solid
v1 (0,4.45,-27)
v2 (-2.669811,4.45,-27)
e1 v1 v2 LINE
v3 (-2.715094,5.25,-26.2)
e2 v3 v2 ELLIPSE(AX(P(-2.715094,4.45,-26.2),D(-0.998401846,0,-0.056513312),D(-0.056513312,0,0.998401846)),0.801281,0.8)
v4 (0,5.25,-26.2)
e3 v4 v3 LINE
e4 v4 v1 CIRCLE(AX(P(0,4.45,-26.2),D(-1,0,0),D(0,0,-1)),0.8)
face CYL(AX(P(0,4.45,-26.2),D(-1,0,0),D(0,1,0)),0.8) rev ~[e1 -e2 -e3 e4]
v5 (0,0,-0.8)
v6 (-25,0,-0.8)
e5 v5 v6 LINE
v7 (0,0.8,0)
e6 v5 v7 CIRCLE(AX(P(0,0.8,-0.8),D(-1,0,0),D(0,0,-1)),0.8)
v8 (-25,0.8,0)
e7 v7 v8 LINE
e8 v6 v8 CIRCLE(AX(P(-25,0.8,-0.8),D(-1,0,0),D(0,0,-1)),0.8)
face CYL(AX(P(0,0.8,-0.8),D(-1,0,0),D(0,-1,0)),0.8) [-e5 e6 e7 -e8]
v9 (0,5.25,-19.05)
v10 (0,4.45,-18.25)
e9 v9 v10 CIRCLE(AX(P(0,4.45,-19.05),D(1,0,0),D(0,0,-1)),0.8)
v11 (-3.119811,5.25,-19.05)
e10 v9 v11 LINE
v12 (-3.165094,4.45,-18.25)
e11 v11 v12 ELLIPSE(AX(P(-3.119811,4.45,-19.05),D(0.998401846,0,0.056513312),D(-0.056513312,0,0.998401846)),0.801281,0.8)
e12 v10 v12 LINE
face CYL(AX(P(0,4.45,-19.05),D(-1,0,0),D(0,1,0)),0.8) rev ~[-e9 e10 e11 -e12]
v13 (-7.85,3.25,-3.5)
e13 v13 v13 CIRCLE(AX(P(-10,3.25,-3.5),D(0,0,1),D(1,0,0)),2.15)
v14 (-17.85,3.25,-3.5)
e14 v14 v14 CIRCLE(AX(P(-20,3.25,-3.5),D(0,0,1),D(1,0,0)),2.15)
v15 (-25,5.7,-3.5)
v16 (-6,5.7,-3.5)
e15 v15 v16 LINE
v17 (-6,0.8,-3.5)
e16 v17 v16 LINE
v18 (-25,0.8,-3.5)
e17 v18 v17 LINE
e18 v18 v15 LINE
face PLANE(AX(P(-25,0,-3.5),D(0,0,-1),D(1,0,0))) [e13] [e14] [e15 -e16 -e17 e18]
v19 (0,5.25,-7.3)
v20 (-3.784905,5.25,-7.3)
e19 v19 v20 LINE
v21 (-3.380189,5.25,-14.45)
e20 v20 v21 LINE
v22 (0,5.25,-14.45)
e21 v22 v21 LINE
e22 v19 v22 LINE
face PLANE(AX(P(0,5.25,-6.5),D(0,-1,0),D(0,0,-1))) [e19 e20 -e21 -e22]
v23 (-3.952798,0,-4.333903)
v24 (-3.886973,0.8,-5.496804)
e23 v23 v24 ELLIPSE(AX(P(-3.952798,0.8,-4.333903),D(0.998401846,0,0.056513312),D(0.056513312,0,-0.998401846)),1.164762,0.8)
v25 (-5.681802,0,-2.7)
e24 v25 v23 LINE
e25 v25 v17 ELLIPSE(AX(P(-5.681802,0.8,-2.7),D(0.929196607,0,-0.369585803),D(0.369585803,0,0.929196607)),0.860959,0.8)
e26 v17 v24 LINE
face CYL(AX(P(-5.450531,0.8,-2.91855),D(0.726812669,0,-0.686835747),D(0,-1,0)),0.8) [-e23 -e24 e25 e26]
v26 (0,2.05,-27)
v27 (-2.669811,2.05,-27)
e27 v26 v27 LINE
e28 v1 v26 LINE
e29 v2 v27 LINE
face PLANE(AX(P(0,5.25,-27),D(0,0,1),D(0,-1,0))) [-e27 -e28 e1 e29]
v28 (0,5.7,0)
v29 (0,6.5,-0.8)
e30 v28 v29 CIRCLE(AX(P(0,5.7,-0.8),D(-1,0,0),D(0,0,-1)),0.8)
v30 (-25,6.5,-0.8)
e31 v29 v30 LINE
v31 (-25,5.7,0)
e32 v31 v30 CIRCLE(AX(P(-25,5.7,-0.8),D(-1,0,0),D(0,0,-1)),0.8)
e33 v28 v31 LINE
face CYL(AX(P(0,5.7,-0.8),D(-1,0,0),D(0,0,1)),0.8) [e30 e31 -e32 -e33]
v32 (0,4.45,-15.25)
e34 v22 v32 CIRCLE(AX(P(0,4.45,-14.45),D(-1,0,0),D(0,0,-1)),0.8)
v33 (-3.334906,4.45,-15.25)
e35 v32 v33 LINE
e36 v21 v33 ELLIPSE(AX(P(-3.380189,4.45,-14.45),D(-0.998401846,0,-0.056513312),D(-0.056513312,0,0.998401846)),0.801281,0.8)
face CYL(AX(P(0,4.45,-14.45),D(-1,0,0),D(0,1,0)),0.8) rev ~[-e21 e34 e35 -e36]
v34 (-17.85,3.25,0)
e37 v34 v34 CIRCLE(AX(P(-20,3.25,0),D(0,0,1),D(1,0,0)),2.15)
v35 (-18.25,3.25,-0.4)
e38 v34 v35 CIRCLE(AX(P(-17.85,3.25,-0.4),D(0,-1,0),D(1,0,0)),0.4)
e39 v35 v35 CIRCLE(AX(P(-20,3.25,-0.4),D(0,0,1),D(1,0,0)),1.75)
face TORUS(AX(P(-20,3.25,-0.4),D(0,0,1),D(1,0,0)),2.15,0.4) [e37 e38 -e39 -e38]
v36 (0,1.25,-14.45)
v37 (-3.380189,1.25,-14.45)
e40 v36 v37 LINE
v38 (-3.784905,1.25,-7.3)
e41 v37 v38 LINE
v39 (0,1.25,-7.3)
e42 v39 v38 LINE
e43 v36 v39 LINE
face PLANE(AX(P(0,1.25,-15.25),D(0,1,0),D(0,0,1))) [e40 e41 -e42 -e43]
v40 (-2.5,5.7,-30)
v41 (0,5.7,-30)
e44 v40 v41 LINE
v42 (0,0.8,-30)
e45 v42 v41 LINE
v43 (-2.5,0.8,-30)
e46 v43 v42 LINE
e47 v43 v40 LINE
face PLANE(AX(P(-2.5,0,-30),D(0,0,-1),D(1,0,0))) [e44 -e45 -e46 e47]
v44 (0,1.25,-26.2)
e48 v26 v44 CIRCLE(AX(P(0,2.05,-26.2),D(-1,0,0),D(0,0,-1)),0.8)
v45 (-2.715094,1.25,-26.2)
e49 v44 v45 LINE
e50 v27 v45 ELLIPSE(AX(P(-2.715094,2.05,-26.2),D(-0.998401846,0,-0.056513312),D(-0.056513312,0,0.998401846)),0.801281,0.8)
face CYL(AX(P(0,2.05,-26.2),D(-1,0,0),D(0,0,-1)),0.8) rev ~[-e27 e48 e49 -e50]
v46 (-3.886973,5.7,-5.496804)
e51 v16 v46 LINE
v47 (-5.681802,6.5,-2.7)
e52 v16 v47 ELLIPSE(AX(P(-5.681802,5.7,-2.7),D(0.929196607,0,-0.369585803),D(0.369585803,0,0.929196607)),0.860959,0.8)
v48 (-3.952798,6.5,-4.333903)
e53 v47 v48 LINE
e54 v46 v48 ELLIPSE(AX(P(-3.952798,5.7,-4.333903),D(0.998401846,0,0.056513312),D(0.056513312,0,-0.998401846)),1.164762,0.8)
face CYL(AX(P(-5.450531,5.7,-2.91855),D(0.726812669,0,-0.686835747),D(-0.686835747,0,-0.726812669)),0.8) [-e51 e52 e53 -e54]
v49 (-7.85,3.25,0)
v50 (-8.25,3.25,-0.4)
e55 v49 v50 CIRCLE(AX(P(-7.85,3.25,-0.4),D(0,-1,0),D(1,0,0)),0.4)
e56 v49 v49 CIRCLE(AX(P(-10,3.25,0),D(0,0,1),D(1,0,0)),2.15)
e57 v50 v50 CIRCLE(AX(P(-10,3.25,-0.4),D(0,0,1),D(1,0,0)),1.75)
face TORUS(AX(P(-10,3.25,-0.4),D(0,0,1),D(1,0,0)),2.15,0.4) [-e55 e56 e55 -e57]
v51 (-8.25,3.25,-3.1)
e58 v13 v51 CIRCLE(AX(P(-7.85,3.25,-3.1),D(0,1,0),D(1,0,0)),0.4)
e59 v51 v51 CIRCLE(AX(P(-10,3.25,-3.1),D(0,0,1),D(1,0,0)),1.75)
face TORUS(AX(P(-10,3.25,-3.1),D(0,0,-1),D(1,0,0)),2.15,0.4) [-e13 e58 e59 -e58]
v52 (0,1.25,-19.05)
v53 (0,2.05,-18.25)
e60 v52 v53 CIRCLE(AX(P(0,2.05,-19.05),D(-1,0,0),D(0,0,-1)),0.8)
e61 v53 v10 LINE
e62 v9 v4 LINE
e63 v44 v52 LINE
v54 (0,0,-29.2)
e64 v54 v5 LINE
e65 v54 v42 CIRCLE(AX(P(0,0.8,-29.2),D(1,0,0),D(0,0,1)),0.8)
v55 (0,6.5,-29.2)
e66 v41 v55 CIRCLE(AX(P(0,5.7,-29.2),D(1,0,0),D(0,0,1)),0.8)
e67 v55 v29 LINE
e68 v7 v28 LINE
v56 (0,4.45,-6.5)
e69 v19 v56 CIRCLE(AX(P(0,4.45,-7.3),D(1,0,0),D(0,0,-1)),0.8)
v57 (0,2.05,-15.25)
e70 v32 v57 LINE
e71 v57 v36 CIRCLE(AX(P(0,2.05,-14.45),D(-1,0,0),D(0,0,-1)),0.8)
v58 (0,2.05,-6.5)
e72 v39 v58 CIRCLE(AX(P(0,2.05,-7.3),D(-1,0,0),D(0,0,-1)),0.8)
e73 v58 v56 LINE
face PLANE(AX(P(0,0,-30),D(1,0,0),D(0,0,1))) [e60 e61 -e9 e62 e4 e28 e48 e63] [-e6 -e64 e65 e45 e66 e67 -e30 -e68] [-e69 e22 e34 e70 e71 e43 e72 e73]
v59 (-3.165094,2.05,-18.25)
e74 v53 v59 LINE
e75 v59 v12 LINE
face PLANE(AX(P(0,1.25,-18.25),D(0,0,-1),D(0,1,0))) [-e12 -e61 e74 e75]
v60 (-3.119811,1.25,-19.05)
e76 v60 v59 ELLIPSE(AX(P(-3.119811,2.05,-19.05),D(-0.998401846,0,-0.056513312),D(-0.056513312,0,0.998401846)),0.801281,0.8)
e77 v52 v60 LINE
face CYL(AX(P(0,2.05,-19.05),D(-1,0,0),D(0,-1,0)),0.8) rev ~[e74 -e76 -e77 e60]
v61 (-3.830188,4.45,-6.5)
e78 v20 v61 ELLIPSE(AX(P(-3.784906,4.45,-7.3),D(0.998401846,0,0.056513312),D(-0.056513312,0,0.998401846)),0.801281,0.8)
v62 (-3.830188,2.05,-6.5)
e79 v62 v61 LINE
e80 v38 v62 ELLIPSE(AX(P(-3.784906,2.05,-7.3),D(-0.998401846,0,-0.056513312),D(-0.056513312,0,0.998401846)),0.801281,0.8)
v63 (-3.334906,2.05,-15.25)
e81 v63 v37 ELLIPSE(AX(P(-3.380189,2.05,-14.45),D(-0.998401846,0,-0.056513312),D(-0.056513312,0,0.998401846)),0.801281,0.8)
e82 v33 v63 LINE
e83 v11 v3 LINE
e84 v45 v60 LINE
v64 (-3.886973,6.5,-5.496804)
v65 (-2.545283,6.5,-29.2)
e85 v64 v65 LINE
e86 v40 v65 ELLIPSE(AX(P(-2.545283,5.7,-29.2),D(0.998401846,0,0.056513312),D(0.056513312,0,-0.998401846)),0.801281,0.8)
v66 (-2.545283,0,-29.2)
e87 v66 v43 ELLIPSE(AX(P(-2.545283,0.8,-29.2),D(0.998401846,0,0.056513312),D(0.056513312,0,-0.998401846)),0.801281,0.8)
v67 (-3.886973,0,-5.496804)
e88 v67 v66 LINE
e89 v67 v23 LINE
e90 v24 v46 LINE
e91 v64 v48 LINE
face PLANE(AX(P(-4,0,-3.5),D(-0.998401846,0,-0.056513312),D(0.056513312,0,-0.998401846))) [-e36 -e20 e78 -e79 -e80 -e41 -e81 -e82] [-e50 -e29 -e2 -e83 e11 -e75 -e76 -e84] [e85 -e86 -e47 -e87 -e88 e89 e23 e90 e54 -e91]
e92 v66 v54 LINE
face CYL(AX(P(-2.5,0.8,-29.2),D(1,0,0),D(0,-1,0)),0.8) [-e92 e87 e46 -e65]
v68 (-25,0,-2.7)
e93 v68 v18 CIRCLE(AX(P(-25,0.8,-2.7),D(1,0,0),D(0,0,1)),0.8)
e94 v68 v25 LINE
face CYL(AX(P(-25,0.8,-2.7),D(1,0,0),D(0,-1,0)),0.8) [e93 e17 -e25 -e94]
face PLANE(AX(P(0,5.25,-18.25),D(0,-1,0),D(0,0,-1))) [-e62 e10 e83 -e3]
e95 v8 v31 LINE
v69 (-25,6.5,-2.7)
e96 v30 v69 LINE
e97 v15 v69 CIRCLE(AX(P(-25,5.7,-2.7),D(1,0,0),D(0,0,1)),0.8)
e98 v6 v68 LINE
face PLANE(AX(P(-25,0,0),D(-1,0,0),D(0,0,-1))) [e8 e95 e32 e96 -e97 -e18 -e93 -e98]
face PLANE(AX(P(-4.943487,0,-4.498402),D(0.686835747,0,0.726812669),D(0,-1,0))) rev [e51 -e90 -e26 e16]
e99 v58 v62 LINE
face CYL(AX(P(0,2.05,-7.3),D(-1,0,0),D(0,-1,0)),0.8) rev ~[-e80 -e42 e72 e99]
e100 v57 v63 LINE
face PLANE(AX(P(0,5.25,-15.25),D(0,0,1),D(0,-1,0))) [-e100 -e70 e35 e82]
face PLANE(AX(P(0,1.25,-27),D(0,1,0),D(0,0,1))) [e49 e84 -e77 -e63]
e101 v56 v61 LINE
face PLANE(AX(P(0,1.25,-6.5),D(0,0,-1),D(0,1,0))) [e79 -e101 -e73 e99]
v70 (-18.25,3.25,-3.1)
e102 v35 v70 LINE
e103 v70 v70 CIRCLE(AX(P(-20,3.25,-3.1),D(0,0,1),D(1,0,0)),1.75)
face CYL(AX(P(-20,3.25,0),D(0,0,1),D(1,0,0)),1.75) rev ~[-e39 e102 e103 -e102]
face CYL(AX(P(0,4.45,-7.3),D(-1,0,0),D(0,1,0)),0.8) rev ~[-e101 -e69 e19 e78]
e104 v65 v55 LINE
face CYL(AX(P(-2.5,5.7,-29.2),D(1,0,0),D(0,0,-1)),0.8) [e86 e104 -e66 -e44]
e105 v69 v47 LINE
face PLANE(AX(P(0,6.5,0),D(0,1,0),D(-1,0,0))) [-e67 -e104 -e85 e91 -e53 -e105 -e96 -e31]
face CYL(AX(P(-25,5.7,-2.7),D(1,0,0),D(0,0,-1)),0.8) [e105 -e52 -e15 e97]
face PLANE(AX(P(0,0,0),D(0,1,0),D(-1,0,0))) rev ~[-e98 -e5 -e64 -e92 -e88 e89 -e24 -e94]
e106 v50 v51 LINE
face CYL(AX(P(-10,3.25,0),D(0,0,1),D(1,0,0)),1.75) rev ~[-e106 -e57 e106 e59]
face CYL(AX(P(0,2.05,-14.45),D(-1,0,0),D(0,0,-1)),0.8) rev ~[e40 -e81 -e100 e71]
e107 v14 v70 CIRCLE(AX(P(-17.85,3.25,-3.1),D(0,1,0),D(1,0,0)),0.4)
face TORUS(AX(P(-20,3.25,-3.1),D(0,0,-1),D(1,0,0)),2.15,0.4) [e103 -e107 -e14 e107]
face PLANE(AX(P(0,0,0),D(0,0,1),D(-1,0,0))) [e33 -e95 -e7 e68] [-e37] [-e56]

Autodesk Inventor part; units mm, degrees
ref_plane "YZ Plane" through (0, 0, 0) normal (1, 0, 0) x (0, 1, 0)
ref_plane "XZ Plane" through (0, 0, 0) normal (0, 1, 0) x (-1, 0, 0)
ref_plane "XY Plane" through (0, 0, 0) normal (0, 0, 1) x (1, 0, 0)
sketch "Szkic1" plane through (0, 0, 0) normal (0, 1, 0) x (-1, 0, 0)
  line L0 (0, 0) -> (25, 0)
  line L1 (25, 0) -> (25, -3.5)
  line L2 (25, -3.5) -> (4, -3.5)
  line L3 (4, -3.5) -> (2.5, -30)
  line L4 (2.5, -30) -> (0, -30)
  line L5 (0, -30) -> (0, 0)
  dimension "d0" = 25
  dimension "d1" = 30
  dimension "d2" = 3.5
  dimension "d3" = 2.5
  dimension "d4" = 4
extrude "Wyciągnięcie proste1" add sketch "Szkic1" along normal blind 6.5
sketch "Szkic2" plane through (0, 0, 0) normal (1, 0, 0) x (0, 0, -1)
  line L0 (0, 0) -> (30, 0) projected
  line L1 (30, 0) -> (30, 6.5) projected
  line L2 (0, 6.5) -> (30, 6.5) projected
  line L3 (0, 0) -> (0, 6.5) projected
  line L4 (30, 3.25) -> (0, 3.25) construction
  line L5 (18.25, 5.25) -> (27, 5.25)
  line L6 (27, 5.25) -> (27, 1.25)
  line L7 (27, 1.25) -> (18.25, 1.25)
  line L8 (18.25, 1.25) -> (18.25, 5.25)
  line L9 (18.25, 5.25) -> (27, 1.25) construction
  line L10 (27, 5.25) -> (18.25, 1.25) construction
  line L11 (6.5, 5.25) -> (15.25, 5.25)
  line L12 (15.25, 5.25) -> (15.25, 1.25)
  line L13 (15.25, 1.25) -> (6.5, 1.25)
  line L14 (6.5, 1.25) -> (6.5, 5.25)
  line L15 (6.5, 5.25) -> (15.25, 1.25) construction
  line L16 (15.25, 5.25) -> (6.5, 1.25) construction
  line L17 (3.5, 0) -> (3.5, 6.5) projected
  point P0 (22.625, 3.25)
  point P1 (10.875, 3.25)
  dimension "d7" = 26.5
  dimension "d8" = 3
  dimension "d9" = 3
  dimension "d10" = 3
  dimension "d11" = 4
extrude "Wyciągnięcie proste2" cut sketch "Szkic2" against normal up to surface contours L5 L6 L7 L8 | L11 L12 L13 L14 surface through (-2.5, 0, -30) normal (-0.9984018, 0, -0.0565133)
sketch "Szkic3" plane through (-25, 0, 0) normal (0, 0, 1) x (1, 0, 0)
  line L0 (0, 0) -> (25, 0) projected
  line L1 (25, 0) -> (25, 6.5) projected
  line L2 (0, 6.5) -> (25, 6.5) construction
  line L3 (0, 0) -> (0, 6.5) projected
  line L4 (0, 3.25) -> (25, 3.25) construction
  circle A0 centre (15, 3.25) radius 1.75
  circle A1 centre (5, 3.25) radius 1.75
  dimension "d14" = 3.5
  dimension "d15" = 10
  dimension "d16" = 10
extrude "Wyciągnięcie proste3" cut sketch "Szkic3" against normal up to surface (3.5 mm away)
chamfer "Faza1" distance 2 angle 45 1 edges at (-4, 3.25, -3.5)
fillet "Zaokrąglenie1" radius 0.8 16 edges at (-1.25, 6.5, -30) (-1.25, 0, -30) (-12.5, 6.5, 0) (-12.5, 0, 0) (-15.5, 0, -3.5) (-15.5, 6.5, -3.5) (-4.9435, 6.5, -4.4984) (-4.9435, 0, -4.4984) (-1.3349, 5.25, -27) (-1.5825, 5.25, -18.25) (-1.3349, 1.25, -27) (-1.5825, 1.25, -18.25) (-1.6675, 5.25, -15.25) (-1.6675, 1.25, -15.25) (-1.9151, 1.25, -6.5) (-1.9151, 5.25, -6.5)
fillet "Zaokrąglenie2" radius 0.4 4 edges at (-11.75, 3.25, -3.5) (-21.75, 3.25, -3.5) (-11.75, 3.25, 0) (-21.75, 3.25, 0)
equation "\"d9\" = d8"
properties part number "noga1"
